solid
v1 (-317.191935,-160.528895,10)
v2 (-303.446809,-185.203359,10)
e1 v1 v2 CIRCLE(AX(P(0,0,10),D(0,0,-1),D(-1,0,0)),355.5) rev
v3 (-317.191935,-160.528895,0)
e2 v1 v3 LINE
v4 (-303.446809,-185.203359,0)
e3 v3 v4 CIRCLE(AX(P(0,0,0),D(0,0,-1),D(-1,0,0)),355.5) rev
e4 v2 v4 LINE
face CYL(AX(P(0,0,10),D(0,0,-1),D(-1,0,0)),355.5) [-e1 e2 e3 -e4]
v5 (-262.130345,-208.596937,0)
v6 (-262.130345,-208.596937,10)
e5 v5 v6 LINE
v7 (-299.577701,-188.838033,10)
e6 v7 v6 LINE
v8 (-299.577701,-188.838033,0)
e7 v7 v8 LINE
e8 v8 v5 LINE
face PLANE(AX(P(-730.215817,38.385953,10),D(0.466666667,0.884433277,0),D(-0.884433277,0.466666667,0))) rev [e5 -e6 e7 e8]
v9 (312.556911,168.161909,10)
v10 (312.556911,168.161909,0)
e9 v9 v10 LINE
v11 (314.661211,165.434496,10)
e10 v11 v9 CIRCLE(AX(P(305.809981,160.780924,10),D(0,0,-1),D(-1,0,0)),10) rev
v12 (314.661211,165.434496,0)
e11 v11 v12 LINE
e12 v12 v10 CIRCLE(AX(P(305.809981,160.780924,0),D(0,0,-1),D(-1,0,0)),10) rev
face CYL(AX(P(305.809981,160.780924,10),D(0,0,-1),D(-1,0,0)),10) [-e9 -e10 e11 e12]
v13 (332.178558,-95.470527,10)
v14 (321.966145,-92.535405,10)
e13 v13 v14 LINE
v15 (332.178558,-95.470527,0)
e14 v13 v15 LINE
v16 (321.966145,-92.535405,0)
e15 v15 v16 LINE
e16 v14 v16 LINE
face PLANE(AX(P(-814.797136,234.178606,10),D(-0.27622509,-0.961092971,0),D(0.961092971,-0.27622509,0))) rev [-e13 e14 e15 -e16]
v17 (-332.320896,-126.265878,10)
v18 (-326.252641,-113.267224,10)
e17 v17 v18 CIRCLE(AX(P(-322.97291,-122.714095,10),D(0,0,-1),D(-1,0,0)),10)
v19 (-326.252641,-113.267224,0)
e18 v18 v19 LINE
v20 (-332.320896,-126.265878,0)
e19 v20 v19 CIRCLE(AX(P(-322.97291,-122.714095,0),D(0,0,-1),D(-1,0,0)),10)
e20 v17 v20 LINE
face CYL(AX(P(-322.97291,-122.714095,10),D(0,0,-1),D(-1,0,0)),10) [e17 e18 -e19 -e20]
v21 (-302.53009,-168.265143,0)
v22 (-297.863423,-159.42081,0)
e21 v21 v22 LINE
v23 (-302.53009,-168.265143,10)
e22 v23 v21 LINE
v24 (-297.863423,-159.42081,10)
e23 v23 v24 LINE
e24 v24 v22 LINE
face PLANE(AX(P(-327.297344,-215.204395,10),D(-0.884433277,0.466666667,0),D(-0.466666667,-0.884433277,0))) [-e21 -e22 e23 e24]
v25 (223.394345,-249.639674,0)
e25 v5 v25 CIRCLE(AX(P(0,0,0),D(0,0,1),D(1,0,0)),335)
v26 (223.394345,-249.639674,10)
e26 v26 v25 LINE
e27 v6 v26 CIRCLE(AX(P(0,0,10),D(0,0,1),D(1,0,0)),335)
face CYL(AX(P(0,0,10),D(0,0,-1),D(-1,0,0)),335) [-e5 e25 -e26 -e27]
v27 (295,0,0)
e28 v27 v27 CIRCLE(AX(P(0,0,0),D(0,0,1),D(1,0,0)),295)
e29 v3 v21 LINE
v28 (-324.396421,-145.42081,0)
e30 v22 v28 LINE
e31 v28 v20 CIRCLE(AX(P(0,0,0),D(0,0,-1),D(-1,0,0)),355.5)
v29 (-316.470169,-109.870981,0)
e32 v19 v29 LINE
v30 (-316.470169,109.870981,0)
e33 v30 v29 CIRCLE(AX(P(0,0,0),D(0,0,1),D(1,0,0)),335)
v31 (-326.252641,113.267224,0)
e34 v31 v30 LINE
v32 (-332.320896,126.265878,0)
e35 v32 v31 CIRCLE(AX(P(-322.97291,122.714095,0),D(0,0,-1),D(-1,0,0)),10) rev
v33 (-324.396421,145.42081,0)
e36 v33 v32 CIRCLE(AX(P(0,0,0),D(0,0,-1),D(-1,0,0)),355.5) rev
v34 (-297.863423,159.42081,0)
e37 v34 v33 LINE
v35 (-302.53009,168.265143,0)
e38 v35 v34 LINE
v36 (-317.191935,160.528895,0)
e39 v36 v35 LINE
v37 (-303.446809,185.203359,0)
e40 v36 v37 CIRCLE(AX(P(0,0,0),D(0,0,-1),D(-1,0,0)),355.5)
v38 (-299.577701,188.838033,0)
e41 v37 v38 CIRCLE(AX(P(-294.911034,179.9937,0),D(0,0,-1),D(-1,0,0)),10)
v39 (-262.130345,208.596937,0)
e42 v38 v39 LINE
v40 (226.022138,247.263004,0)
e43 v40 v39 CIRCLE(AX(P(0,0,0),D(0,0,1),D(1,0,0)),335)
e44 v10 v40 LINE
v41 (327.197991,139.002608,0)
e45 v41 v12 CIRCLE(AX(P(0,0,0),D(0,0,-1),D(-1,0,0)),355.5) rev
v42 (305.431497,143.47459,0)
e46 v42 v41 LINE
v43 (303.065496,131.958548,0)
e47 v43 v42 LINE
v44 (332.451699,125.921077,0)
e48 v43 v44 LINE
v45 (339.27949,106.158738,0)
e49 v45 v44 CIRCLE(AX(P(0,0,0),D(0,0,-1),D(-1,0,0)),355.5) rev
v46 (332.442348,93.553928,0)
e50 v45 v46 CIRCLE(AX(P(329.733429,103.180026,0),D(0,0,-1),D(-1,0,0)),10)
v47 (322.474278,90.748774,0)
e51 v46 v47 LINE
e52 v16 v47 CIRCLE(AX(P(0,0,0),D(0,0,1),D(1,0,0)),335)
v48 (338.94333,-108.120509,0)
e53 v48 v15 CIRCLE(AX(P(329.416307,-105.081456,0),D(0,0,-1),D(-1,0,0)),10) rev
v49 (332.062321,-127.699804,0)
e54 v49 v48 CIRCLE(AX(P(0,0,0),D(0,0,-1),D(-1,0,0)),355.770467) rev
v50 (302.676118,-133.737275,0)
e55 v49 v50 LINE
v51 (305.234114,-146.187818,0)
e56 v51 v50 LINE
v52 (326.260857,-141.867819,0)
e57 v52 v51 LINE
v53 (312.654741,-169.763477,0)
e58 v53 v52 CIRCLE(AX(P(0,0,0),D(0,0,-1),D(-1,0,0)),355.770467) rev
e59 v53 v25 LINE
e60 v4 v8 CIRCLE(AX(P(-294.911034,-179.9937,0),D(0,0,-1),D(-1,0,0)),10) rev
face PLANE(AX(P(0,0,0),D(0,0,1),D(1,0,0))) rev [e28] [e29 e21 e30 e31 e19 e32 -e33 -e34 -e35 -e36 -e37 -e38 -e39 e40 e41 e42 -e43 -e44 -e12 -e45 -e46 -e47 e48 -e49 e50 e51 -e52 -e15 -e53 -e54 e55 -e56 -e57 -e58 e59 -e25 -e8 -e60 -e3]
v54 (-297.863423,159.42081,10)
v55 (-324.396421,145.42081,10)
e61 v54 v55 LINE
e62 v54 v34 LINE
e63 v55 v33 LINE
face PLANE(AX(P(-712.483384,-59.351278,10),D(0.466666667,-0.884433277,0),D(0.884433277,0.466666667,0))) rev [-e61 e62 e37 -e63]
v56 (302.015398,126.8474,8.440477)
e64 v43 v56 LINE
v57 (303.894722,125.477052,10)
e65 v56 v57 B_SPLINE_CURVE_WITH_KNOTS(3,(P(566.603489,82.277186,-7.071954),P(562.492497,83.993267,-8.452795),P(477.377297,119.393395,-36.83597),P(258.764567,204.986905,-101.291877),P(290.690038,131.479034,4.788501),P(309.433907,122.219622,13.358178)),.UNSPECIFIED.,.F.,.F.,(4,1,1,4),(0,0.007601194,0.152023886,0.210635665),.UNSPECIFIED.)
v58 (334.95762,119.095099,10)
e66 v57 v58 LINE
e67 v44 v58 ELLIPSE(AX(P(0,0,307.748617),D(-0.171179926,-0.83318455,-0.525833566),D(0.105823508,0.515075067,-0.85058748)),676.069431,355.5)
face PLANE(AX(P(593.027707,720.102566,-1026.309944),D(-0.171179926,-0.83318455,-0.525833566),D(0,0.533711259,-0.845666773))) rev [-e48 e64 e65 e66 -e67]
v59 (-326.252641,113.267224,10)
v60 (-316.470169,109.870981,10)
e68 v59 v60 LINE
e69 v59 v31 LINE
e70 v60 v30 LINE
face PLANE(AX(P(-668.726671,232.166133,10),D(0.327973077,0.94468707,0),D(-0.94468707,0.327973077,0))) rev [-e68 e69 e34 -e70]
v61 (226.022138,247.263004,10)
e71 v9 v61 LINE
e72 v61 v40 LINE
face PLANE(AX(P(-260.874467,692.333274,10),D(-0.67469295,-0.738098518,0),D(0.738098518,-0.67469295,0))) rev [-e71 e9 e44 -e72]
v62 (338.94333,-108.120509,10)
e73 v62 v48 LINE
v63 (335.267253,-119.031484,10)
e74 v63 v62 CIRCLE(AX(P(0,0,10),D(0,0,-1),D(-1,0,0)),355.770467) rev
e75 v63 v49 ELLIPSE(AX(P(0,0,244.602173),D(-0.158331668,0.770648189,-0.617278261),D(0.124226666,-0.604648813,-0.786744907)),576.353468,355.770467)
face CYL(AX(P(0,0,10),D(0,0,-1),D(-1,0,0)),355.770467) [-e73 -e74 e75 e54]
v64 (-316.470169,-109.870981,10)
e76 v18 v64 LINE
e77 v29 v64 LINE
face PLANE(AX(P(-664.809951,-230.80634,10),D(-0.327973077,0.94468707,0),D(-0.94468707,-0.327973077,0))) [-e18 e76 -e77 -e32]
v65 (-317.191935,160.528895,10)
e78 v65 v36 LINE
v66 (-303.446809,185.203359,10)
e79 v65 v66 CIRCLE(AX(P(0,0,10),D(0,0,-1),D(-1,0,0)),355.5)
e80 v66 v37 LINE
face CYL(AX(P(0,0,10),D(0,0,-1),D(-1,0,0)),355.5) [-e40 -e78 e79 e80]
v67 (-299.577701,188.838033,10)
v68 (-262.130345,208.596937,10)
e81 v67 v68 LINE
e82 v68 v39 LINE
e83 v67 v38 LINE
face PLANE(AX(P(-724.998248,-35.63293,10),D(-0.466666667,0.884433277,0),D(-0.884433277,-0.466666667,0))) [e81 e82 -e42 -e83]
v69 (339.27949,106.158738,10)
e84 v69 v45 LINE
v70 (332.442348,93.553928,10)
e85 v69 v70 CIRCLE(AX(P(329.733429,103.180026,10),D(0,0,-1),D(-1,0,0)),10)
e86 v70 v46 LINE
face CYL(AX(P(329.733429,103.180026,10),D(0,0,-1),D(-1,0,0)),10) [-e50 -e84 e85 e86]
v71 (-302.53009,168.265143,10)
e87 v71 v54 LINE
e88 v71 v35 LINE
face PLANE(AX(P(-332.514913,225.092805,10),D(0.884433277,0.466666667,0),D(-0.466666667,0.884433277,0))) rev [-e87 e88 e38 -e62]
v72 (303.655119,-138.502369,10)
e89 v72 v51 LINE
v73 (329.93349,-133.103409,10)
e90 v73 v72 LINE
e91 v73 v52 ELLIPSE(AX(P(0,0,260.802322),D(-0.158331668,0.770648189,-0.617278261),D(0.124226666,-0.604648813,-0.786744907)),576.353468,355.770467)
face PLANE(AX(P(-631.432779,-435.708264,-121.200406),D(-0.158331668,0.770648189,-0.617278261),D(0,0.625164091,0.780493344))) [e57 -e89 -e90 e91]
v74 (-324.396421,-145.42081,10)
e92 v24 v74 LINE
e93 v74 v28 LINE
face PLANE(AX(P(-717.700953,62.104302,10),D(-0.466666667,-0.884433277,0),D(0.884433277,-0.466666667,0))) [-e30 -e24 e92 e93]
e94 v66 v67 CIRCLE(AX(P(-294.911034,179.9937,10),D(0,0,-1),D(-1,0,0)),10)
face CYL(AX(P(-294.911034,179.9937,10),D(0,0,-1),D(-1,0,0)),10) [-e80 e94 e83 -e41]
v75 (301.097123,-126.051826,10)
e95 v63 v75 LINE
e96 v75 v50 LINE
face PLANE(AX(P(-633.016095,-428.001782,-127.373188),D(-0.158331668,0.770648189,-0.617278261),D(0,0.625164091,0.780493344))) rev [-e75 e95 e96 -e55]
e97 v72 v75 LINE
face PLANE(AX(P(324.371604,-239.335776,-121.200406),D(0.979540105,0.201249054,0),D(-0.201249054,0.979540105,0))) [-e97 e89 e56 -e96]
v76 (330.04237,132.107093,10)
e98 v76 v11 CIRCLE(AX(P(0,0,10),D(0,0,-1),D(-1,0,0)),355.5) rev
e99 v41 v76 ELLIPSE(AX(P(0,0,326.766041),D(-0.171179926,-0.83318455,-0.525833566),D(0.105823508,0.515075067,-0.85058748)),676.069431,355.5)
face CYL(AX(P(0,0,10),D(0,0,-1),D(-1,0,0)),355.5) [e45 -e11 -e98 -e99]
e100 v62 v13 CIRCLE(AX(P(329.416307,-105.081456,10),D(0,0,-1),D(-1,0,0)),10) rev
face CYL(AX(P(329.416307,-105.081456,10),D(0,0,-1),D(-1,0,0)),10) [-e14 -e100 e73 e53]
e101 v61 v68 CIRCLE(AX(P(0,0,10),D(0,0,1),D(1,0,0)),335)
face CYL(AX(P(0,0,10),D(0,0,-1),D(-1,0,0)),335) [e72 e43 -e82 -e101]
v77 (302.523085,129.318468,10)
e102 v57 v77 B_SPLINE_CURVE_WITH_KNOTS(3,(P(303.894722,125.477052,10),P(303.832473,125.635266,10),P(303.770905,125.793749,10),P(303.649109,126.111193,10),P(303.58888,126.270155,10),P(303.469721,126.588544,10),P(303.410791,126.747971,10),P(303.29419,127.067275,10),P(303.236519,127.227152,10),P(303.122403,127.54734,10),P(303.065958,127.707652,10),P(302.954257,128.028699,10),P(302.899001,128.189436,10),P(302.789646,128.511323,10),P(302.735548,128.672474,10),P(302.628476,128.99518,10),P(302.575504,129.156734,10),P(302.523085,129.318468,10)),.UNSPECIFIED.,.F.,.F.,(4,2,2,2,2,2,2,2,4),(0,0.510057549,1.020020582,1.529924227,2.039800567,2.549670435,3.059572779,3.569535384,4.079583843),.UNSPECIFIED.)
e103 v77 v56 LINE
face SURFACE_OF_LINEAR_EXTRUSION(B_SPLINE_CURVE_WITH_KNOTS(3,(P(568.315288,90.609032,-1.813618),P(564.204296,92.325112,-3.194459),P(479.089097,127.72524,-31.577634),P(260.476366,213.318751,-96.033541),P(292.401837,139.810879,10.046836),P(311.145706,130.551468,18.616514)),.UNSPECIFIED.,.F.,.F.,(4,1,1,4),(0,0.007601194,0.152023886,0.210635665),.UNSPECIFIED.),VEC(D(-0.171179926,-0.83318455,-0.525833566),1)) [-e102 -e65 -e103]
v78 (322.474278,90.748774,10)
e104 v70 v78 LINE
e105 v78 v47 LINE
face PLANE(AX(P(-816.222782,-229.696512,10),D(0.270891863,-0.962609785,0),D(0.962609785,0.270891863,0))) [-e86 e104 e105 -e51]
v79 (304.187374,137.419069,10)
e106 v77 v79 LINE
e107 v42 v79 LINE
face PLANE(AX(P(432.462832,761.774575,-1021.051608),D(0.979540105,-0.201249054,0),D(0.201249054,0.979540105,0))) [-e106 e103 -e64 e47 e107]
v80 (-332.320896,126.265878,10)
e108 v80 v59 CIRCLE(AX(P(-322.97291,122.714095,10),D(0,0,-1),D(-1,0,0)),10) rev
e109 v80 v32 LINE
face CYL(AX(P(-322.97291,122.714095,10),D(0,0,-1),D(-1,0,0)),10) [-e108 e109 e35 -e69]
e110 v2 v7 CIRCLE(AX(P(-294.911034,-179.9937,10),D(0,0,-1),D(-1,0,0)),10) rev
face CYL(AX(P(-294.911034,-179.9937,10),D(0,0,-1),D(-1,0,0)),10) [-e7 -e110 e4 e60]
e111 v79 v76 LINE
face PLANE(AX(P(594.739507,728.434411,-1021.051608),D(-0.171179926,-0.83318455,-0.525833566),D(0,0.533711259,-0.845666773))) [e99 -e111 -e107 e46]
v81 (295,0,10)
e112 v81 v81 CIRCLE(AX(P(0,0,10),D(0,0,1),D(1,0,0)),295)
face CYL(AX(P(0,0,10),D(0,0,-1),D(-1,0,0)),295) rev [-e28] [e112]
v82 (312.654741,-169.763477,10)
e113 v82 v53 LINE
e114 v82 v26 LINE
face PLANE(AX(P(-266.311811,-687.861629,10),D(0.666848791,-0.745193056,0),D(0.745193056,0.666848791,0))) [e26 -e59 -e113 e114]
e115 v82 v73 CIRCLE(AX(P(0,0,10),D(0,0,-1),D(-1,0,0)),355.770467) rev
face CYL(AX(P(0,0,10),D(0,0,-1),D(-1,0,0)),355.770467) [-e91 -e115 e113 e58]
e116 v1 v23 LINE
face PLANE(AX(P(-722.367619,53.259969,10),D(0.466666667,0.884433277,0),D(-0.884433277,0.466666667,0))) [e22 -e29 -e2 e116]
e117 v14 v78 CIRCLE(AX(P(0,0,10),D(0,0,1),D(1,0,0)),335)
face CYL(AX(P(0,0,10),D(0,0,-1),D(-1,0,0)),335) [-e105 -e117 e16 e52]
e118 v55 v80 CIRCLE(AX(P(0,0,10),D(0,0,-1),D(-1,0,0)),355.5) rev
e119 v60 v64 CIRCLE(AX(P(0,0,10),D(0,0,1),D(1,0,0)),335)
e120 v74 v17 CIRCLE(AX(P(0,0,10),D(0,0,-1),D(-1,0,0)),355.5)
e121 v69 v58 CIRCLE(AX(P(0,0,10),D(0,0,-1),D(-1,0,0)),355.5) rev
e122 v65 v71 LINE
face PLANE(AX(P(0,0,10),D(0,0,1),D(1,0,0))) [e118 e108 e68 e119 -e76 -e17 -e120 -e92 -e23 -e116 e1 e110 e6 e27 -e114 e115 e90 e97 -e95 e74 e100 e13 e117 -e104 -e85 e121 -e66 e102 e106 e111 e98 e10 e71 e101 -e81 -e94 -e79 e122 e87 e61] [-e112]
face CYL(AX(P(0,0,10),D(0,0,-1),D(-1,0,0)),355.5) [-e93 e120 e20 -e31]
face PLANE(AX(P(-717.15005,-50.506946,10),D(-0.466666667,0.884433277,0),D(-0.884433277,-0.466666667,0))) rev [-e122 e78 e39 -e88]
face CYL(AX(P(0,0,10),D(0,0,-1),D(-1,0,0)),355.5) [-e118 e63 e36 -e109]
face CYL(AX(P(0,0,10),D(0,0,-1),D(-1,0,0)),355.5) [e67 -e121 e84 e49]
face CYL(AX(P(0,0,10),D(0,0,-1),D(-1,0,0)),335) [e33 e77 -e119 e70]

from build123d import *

# Parameters (mm, degrees)
SKETCH1_R            = 335
SKETCH1_R_2          = 295
BOSS_EXTRUDE1_DEPTH  = 10
BOSS_EXTRUDE2_DEPTH  = 10
BOSS_EXTRUDE3_DEPTH  = 10
CUT_EXTRUDE1_DEPTH   = 10
CUT_EXTRUDE2_START   = 272.424930167
CUT_EXTRUDE2_DEPTH   = 38.548591659
CUT_EXTRUDE2_START_2 = 161.824552733
CUT_EXTRUDE2_2_DEPTH = 10
BOSS_EXTRUDE4_DEPTH  = 10


with BuildPart() as part:
    # Sketch1 → Boss-Extrude1 (new body)
    with BuildSketch(Plane.XY):
        Circle(SKETCH1_R)
        Circle(SKETCH1_R_2, mode=Mode.SUBTRACT)
    extrude(amount=BOSS_EXTRUDE1_DEPTH)

    # Sketch2 → Boss-Extrude2 (add)
    with BuildSketch(Plane(origin=(0, 0, 0), x_dir=(-1, 0, 0), z_dir=(0, 0, -1))):
        with BuildLine():
            ThreePointArc((-322.474278085, 90.748773952), (-285.195118694, 175.7519396), (-226.022138309, 247.263003691))
            Line((-226.022138309, 247.263003691), (-312.556910604, 168.161908985))
            ThreePointArc((-312.556910604, 168.161908985), (-313.727388299, 166.889496734), (-314.661210657, 165.434496124))
            ThreePointArc((-314.661210657, 165.434496124), (-328.310849458, 136.353350264), (-339.27949001, 106.158738023))
            ThreePointArc((-339.27949001, 106.158738023), (-338.523562212, 98.412053492), (-332.442347906, 93.553928275))
            Line((-332.442347906, 93.553928275), (-322.474278085, 90.748773952))
        make_face()
    extrude(amount=-BOSS_EXTRUDE2_DEPTH)

    # Sketch3 → Boss-Extrude3 (add)
    with BuildSketch(Plane(origin=(0, 0, 0), x_dir=(-1, 0, 0), z_dir=(0, 0, -1))):
        with BuildLine():
            Line((-289.450839465, -149.430532958), (-290.086949825, -136.323752762))
            Line((-290.086949825, -136.323752762), (-321.966145398, -92.535405211))
            Line((-321.966145398, -92.535405211), (-332.178557921, -95.470526635))
            ThreePointArc((-332.178557921, -95.470526635), (-338.234587628, -100.365745681), (-338.943329669, -108.120508737))
            ThreePointArc((-338.943329669, -108.120508737), (-327.253686464, -139.562351058), (-312.654741, -169.763476834))
            Line((-312.654741, -169.763476834), (-223.394344885, -249.639673677))
            Line((-223.394344885, -249.639673677), (-289.450839465, -149.430532958))
        make_face()
    extrude(amount=-BOSS_EXTRUDE3_DEPTH)

    # Sketch4 → Cut-Extrude1 (cut)
    with BuildSketch(Plane(origin=(23.906119202, -116.35832345, 93.20136559), x_dir=(0.9873859847265816, 0.12357681316719145, -0.0989832733999036), z_dir=(-0.15833166823323438, 0.7706481888305408, -0.6172782613106412))):
        Polygon((282.331330651, 83.607742228), (286.950805192, 120.032776555), (337.459038649, 113.627250716), (329.847523561, 53.609667359), (279.339290104, 60.015193198), align=None)
    extrude(amount=-CUT_EXTRUDE1_DEPTH, mode=Mode.SUBTRACT)

    # Cut-Extrude2: read off the stored shape, not the designer's step
    # Cut-Extrude2 outline → Cut-Extrude2 (cut)
    with BuildSketch(Plane(origin=(0, 0, 0), x_dir=(0.20124905404319107, 0.9795401054815064, 0), z_dir=(0.9795401054815065, -0.20124905404319107, 0)).offset(CUT_EXTRUDE2_START)):
        Polygon((202.006915017, 0), (195.824910476, 10), (184.068330185, 10), (190.250334726, 0), align=None)
    extrude(amount=CUT_EXTRUDE2_DEPTH, mode=Mode.SUBTRACT)

    # Cut-Extrude2 2 outline → Cut-Extrude2 2 (cut)
    with BuildSketch(Plane(origin=(0, 0, 0), x_dir=(0.9852397845422891, -0.14476117541924635, -0.09136065370990885), z_dir=(0.1711799256778192, 0.8331845496216821, 0.5258335661753164)).offset(CUT_EXTRUDE2_START_2)):
        with BuildLine():
            Line((280.153711914, 76.574004203), (278.423879054, 60.562054707))
            add(Edge.make_bspline(
                [(278.423879054, 60.562054707), (279.04318666, 59.849827211), (279.679221342, 59.165584066), (280.331358402, 58.511847756)],
                knots=[0.202262646, 0.202262646, 0.202262646, 0.202262646, 0.204525626, 0.204525626, 0.204525626, 0.204525626], degree=3))
            Line((280.331358402, 58.511847756), (282.258121917, 76.346656647))
            Line((282.258121917, 76.346656647), (282.436738997, 78))
            Line((282.436738997, 78), (280.307767758, 78))
            Line((280.307767758, 78), (280.153711914, 76.574004203))
        make_face()
    extrude(amount=CUT_EXTRUDE2_2_DEPTH, mode=Mode.SUBTRACT)

    # Sketch6 → Boss-Extrude4 (add)
    with BuildSketch(Plane(origin=(0, 0, 0), x_dir=(-1, 0, 0), z_dir=(0, 0, -1))):
        with BuildLine():
            Line((297.863422842, -159.420809844), (324.396421164, -145.420809844))
            ThreePointArc((324.396421164, -145.420809844), (328.498305309, -135.901116291), (332.320896217, -126.265877963))
            ThreePointArc((332.320896217, -126.265877963), (332.034149526, -118.483971626), (326.252641154, -113.267224475))
            Line((326.252641154, -113.267224475), (309.887866806, -107.585760677))
            Line((309.887866806, -107.585760677), (279.768360506, -168.96857635))
            Line((279.768360506, -168.96857635), (279.768360506, -180.275251772))
            Line((279.768360506, -180.275251772), (256.883838664, -211.365229457))
            Line((256.883838664, -211.365229457), (299.577700502, -188.838033003))
            ThreePointArc((299.577700502, -188.838033003), (301.757845667, -187.282127202), (303.446809055, -185.203358702))
            ThreePointArc((303.446809055, -185.203358702), (310.564518318, -173.00268773), (317.191935305, -160.528895148))
            Line((317.191935305, -160.528895148), (302.530089508, -168.265142618))
            Line((302.530089508, -168.265142618), (297.863422842, -159.420809844))
        make_face()
        with BuildLine():
            Line((324.396421164, 145.420809844), (297.863422842, 159.420809844))
            Line((297.863422842, 159.420809844), (302.530089508, 168.265142618))
            Line((302.530089508, 168.265142618), (317.191935305, 160.528895148))
            ThreePointArc((317.191935305, 160.528895148), (310.564518318, 173.00268773), (303.446809055, 185.203358702))
            ThreePointArc((303.446809055, 185.203358702), (301.757845667, 187.282127202), (299.577700502, 188.838033003))
            Line((299.577700502, 188.838033003), (256.883838664, 211.365229457))
            Line((256.883838664, 211.365229457), (279.768360506, 180.275251772))
            Line((279.768360506, 180.275251772), (279.768360506, 168.96857635))
            Line((279.768360506, 168.96857635), (309.887866806, 107.585760677))
            Line((309.887866806, 107.585760677), (326.252641154, 113.267224475))
            ThreePointArc((326.252641154, 113.267224475), (332.034149526, 118.483971626), (332.320896217, 126.265877963))
            ThreePointArc((332.320896217, 126.265877963), (328.498305309, 135.901116291), (324.396421164, 145.420809844))
        make_face()
    extrude(amount=-BOSS_EXTRUDE4_DEPTH)


solid = part.part
